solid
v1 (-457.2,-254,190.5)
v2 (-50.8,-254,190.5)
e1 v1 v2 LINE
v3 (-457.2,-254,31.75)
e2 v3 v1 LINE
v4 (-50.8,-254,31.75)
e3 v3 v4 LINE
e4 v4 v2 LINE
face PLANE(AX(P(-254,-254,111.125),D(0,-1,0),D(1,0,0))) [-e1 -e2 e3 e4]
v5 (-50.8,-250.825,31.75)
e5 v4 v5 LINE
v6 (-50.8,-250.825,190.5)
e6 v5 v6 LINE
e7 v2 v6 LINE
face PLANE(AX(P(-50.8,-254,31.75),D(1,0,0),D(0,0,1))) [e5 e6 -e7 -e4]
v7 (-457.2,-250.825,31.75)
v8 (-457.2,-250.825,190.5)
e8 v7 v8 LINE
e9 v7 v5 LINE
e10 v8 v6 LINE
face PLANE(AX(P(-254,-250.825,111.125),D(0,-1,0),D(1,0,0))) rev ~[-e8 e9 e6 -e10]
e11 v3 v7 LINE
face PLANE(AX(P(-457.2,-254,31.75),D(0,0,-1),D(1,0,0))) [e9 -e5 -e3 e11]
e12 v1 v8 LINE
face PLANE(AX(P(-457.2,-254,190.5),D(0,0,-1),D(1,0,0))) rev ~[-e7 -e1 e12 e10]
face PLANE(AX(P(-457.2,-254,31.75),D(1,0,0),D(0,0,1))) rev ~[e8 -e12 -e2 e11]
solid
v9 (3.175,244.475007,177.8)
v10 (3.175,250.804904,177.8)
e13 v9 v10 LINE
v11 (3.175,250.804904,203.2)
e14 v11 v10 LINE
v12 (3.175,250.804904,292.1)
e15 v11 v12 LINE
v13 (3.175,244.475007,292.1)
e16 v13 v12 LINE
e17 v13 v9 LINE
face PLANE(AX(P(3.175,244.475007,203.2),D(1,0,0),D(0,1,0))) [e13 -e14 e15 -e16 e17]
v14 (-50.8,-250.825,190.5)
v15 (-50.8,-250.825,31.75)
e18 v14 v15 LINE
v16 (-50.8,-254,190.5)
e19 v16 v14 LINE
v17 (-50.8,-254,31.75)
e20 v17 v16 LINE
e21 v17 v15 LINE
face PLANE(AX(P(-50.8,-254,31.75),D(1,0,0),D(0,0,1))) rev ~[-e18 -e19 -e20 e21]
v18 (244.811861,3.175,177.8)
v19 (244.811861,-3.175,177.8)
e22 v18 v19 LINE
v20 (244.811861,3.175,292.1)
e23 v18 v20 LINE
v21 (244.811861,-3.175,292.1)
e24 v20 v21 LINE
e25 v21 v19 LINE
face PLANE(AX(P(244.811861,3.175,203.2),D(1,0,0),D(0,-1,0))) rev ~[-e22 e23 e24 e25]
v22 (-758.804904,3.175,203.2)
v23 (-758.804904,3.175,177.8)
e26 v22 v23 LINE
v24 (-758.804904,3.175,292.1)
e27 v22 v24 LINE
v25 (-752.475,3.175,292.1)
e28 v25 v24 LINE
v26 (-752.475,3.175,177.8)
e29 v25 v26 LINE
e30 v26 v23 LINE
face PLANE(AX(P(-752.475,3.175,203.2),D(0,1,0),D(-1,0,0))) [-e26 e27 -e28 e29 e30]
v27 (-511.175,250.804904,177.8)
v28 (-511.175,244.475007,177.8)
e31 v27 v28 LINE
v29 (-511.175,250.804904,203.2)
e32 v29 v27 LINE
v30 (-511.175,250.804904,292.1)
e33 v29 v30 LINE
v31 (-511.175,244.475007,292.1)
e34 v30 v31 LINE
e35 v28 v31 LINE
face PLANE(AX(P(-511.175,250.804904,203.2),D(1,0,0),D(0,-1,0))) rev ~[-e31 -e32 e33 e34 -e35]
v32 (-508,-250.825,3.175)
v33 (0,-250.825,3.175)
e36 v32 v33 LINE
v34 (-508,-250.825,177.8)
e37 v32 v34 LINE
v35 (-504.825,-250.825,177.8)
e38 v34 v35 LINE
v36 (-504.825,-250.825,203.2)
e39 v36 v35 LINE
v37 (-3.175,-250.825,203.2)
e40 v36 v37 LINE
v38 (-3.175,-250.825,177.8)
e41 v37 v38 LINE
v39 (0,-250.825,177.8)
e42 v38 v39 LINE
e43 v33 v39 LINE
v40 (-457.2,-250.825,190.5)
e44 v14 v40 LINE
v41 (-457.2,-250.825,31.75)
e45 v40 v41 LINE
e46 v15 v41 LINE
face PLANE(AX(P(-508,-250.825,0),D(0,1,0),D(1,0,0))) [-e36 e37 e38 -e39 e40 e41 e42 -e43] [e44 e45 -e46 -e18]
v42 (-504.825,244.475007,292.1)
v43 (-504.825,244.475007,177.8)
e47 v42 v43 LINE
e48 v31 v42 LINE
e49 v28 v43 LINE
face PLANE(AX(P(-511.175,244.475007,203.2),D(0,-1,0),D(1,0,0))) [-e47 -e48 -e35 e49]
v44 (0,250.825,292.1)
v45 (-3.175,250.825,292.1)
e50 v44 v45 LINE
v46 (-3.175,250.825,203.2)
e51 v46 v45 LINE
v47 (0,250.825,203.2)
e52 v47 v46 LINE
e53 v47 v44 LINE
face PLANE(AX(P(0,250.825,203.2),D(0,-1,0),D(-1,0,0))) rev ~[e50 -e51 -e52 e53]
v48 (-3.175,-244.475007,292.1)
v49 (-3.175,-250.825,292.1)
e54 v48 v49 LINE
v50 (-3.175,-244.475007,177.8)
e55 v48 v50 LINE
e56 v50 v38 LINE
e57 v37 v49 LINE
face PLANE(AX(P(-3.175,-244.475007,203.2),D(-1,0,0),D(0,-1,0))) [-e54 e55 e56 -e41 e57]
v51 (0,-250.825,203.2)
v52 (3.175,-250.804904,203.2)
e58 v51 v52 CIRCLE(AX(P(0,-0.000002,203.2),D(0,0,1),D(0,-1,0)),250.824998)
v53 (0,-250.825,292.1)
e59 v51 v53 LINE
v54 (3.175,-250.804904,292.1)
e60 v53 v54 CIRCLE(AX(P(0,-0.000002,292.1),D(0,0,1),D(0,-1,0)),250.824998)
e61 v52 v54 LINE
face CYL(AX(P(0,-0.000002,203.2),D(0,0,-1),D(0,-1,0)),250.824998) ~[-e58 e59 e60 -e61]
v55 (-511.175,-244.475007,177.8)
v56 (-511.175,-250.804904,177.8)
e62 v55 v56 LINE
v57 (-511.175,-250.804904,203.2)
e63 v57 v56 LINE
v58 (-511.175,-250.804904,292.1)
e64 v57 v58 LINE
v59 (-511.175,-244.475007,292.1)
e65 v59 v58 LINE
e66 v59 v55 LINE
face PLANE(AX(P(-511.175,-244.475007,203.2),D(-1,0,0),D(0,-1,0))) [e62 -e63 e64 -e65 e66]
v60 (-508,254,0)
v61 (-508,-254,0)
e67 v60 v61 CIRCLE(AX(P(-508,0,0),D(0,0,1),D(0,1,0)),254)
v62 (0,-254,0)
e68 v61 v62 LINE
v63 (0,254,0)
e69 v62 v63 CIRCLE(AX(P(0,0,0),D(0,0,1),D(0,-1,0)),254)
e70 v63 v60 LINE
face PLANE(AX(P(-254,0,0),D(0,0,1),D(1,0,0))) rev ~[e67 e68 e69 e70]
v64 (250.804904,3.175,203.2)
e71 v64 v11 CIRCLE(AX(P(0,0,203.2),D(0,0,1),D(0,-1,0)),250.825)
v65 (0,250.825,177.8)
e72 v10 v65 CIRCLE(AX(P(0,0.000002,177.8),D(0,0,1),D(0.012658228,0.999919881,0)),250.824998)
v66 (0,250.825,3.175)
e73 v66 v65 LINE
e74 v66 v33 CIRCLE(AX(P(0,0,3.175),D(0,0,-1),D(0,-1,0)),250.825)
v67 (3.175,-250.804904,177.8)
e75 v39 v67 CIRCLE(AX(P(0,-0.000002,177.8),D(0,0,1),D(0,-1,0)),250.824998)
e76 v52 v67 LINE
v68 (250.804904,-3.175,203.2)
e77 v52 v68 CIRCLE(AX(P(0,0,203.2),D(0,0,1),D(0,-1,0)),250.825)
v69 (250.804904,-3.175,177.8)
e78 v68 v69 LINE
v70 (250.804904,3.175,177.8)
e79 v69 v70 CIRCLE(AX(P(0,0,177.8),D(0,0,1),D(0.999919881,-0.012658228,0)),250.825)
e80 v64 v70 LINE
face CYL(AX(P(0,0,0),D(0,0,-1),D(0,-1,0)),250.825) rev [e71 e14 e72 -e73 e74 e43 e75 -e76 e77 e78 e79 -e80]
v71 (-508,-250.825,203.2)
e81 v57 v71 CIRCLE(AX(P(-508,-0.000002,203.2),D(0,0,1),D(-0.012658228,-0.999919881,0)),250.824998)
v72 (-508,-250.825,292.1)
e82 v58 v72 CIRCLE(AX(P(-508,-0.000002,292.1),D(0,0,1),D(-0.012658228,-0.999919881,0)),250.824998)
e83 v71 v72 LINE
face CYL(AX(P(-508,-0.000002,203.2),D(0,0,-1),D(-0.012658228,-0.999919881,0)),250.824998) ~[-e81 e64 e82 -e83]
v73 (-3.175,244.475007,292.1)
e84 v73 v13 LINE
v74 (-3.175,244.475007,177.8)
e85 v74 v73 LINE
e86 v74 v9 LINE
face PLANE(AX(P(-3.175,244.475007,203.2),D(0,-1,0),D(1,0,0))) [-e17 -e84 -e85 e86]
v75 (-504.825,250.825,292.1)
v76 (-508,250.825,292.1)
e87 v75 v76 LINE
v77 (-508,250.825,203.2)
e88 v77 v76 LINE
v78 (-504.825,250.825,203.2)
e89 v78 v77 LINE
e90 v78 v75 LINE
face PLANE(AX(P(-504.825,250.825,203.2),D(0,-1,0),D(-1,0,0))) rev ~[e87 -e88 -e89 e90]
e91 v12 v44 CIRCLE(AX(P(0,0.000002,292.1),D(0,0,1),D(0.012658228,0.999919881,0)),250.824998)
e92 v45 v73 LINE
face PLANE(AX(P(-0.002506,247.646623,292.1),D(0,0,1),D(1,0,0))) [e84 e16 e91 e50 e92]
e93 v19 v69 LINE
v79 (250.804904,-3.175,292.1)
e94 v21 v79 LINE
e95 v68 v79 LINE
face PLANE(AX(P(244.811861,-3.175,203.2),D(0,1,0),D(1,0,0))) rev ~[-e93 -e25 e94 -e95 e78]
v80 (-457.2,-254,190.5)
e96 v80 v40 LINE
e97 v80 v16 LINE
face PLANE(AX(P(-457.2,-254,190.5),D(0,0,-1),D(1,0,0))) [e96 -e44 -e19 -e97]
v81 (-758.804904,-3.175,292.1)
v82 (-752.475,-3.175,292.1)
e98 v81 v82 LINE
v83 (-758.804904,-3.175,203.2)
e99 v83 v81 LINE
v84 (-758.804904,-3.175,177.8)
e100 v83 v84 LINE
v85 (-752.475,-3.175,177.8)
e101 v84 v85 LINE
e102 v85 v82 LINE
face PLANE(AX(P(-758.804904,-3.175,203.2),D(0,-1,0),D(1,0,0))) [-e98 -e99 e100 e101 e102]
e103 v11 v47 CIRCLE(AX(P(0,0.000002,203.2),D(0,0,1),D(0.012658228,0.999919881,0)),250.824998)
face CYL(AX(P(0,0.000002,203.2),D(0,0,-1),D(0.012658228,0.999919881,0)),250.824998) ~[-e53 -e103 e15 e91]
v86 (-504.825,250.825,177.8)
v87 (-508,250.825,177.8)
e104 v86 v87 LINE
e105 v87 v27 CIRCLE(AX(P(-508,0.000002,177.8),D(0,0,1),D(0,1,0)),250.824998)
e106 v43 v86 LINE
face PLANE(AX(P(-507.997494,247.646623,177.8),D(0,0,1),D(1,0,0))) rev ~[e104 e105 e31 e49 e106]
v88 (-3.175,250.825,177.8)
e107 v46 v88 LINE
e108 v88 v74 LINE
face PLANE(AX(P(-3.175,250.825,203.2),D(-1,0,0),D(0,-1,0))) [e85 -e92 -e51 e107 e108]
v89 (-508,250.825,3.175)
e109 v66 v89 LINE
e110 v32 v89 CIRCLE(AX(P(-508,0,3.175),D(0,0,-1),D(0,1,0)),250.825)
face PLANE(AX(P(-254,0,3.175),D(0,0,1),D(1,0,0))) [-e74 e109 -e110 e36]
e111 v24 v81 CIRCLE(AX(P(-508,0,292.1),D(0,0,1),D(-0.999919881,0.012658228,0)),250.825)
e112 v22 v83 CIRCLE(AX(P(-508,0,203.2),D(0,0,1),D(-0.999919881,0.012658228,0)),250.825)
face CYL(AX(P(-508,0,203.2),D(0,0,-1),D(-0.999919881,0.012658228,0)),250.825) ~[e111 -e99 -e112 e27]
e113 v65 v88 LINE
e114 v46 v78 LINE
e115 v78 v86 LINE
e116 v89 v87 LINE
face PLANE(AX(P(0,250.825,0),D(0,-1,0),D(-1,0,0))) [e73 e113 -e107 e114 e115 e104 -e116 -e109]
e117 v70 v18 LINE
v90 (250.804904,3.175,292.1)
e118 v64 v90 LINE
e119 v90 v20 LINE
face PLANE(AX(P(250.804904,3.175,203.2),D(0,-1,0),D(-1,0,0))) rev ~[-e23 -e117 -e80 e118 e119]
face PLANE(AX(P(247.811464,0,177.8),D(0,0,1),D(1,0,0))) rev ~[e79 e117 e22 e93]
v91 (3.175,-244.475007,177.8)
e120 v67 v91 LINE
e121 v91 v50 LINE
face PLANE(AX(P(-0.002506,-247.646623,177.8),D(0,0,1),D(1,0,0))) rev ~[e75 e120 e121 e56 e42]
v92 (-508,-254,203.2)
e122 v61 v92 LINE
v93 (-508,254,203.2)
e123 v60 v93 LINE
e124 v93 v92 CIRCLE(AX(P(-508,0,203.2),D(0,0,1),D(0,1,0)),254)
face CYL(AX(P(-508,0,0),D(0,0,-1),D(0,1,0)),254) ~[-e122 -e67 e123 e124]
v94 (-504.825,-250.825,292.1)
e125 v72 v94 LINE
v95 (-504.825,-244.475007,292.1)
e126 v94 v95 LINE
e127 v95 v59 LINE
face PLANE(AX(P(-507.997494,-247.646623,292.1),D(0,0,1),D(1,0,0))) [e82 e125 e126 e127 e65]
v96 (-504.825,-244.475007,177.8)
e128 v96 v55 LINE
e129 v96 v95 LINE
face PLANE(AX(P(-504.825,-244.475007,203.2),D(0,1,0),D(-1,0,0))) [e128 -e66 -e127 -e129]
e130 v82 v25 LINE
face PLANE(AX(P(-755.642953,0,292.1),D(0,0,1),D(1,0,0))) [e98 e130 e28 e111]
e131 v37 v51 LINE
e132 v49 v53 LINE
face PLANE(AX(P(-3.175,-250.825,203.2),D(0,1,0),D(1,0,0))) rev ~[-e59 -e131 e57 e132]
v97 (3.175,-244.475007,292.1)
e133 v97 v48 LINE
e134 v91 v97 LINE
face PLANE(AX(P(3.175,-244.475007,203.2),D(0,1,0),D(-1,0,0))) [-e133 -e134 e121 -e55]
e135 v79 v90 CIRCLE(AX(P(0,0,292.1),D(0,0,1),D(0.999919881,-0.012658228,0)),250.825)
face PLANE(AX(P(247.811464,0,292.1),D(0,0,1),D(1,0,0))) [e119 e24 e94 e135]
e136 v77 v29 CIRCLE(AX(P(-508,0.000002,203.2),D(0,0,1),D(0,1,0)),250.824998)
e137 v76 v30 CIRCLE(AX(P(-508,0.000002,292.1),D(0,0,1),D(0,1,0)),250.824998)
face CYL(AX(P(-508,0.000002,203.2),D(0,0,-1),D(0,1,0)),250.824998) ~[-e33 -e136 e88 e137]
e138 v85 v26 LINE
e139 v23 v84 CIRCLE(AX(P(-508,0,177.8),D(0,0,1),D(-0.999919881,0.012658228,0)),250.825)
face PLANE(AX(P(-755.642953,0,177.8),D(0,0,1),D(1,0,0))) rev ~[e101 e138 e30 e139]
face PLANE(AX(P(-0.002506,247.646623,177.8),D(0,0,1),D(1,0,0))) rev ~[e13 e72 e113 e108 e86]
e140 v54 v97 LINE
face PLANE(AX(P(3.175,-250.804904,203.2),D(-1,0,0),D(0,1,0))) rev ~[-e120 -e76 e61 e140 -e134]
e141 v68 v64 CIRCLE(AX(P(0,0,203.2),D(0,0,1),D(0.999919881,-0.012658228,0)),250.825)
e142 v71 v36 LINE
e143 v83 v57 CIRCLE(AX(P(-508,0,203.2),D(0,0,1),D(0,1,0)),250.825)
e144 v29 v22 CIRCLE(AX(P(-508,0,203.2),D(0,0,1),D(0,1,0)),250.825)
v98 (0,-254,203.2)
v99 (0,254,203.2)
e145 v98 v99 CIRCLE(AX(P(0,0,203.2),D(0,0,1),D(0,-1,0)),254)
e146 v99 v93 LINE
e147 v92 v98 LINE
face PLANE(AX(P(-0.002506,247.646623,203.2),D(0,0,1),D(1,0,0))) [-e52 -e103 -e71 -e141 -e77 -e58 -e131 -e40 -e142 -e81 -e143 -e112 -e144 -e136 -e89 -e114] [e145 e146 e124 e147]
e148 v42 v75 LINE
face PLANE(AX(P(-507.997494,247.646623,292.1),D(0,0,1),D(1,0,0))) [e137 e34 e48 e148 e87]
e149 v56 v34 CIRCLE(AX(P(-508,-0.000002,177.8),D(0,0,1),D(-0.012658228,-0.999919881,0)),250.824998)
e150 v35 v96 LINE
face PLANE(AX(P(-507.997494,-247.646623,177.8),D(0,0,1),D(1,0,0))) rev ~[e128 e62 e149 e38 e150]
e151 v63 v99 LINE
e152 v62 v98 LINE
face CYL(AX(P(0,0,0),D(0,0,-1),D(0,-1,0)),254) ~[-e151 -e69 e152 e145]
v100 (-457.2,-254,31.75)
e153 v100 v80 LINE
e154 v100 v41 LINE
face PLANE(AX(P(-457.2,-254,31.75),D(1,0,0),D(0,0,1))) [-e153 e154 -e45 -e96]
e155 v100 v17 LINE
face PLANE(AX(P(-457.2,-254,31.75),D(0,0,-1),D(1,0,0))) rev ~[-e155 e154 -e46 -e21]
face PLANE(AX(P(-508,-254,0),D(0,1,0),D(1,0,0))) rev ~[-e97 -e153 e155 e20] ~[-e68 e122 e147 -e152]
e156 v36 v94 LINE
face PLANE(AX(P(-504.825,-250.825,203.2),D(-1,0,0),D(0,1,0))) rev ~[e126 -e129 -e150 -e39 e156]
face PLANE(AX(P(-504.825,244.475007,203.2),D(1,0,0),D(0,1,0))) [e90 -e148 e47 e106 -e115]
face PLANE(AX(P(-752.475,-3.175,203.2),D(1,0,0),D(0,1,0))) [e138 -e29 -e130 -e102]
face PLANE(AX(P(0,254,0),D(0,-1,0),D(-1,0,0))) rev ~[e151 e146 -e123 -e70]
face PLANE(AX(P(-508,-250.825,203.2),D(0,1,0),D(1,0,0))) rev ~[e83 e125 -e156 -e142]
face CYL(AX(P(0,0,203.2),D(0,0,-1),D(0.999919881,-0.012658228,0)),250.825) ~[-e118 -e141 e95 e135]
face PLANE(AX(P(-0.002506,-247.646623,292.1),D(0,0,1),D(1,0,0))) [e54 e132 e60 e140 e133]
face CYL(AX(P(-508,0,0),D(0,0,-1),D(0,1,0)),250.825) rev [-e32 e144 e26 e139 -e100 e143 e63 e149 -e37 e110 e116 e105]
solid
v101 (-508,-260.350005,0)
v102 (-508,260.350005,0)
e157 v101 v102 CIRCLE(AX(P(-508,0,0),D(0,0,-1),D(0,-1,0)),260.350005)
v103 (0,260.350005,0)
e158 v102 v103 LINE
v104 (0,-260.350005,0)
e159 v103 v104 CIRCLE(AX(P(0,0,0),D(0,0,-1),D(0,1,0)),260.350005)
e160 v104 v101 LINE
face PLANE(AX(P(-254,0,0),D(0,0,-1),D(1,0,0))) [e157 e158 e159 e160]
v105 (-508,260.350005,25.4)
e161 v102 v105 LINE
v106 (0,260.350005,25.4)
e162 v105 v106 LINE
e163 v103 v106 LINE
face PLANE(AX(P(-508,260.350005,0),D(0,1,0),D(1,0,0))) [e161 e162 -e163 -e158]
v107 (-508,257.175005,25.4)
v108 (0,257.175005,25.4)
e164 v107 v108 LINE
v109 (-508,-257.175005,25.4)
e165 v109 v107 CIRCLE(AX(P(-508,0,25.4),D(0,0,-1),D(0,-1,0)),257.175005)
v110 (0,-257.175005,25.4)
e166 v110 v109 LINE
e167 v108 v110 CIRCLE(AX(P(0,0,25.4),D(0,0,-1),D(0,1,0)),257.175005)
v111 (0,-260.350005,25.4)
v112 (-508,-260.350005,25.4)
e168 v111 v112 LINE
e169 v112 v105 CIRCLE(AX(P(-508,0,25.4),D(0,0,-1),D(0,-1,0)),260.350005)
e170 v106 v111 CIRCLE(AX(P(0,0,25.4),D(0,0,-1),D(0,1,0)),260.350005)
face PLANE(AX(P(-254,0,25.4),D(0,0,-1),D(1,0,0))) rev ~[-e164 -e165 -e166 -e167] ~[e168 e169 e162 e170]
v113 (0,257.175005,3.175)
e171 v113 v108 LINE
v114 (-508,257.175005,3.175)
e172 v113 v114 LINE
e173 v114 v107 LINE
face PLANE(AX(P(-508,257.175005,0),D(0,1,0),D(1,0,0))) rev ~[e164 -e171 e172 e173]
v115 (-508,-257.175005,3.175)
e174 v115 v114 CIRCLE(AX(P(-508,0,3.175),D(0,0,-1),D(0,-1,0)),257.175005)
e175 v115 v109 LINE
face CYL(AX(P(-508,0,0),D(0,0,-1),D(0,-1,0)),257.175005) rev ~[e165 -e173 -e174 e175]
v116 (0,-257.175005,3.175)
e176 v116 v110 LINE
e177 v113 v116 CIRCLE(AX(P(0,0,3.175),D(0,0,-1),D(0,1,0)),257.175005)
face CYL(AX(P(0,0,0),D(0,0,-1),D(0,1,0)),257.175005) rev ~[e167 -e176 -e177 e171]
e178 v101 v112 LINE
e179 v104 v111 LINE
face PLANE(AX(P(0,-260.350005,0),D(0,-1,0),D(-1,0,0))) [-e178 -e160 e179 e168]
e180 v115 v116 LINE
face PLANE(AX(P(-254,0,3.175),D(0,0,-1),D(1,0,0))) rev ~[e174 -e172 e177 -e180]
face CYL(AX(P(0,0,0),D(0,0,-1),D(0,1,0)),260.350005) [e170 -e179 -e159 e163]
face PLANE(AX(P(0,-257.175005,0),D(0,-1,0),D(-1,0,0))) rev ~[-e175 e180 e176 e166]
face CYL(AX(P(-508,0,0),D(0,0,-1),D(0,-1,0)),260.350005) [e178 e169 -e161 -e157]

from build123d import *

# Parameters (mm, degrees)
F1_DEPTH       = 203.2
F2_T           = -3.175
F4_W           = 406.4
F4_H           = 158.75
F5_DEPTH       = 25.4
F6_W           = 406.4
F6_H           = 158.75
F7_DEPTH       = 3.175
F10_DEPTH      = 25.4
F11_T          = -3.175
F14_DEPTH      = 25.4
F14_DEPTH_BACK = 88.9


with BuildPart() as f1:
    # F0 (on Top) → F1 (new body)
    with BuildSketch(Plane.XY):
        with BuildLine():
            Line((-508, -254), (0, -254))
            ThreePointArc((0, -254), (254, 0), (0, 254))
            Line((0, 254), (-508, 254))
            ThreePointArc((-508, 254), (-762, 0), (-508, -254))
        make_face()
    extrude(amount=F1_DEPTH)

    # F2
    f2_openings = [f1.faces().sort_by_distance(p)[0] for p in [
        (-254, 0, 203.2),
    ]]
    offset(amount=F2_T, openings=f2_openings)

    # F4 (on offset) → F5 (cut)
    with BuildSketch(Plane.XZ.offset(254)):
        with Locations((-254, 111.125)):
            Rectangle(F4_W, F4_H)
    extrude(amount=-F5_DEPTH, mode=Mode.SUBTRACT)

    # F13 (on offset) → F14 (join, two sides)
    with BuildSketch(Plane.XY.offset(203.2)) as f14_sk:
        with BuildLine():
            ThreePointArc((250.8049042583, -3.175), (250.825, 0), (250.8049042583, 3.175))
            Line((250.8049042583, 3.175), (244.8118613124, 3.175))
            Line((244.8118613124, 3.175), (244.8118613124, -3.175))
            Line((244.8118613124, -3.175), (250.8049042583, -3.175))
        make_face()
        with BuildLine():
            Line((0, 250.825), (-3.175, 250.825))
            Line((-3.175, 250.825), (-3.175, 244.4750070572))
            Line((-3.175, 244.4750070572), (0, 244.4750070572))
            Line((0, 244.4750070572), (3.175, 244.4750070572))
            Line((3.175, 244.4750070572), (3.175, 250.8049042583))
            ThreePointArc((3.175, 250.8049042583), (1.587531798, 250.8199760143), (0, 250.825))
        make_face()
        with BuildLine():
            Line((-504.825, 250.825), (-508, 250.825))
            ThreePointArc((-508, 250.825), (-509.587531798, 250.8199760143), (-511.175, 250.8049042583))
            Line((-511.175, 250.8049042583), (-511.175, 244.4750070572))
            Line((-511.175, 244.4750070572), (-508, 244.4750070572))
            Line((-508, 244.4750070572), (-504.825, 244.4750070572))
            Line((-504.825, 244.4750070572), (-504.825, 250.825))
        make_face()
        with BuildLine():
            Line((-752.475, 3.175), (-758.8049042583, 3.175))
            ThreePointArc((-758.8049042583, 3.175), (-758.825, 0), (-758.8049042583, -3.175))
            Line((-758.8049042583, -3.175), (-752.475, -3.175))
            Line((-752.475, -3.175), (-752.475, 0))
            Line((-752.475, 0), (-752.475, 3.175))
        make_face()
        with BuildLine():
            Line((-511.175, -244.4750070572), (-511.175, -250.8049042583))
            ThreePointArc((-511.175, -250.8049042583), (-509.587531798, -250.8199760143), (-508, -250.825))
            Line((-508, -250.825), (-504.825, -250.825))
            Line((-504.825, -250.825), (-504.825, -244.4750070572))
            Line((-504.825, -244.4750070572), (-508, -244.4750070572))
            Line((-508, -244.4750070572), (-511.175, -244.4750070572))
        make_face()
        with BuildLine():
            Line((-3.175, -244.4750070572), (-3.175, -250.825))
            Line((-3.175, -250.825), (0, -250.825))
            ThreePointArc((0, -250.825), (1.587531798, -250.8199760143), (3.175, -250.8049042583))
            Line((3.175, -250.8049042583), (3.175, -244.4750070572))
            Line((3.175, -244.4750070572), (0, -244.4750070572))
            Line((0, -244.4750070572), (-3.175, -244.4750070572))
        make_face()
    extrude(amount=-F14_DEPTH)
    extrude(f14_sk.sketch, amount=F14_DEPTH_BACK)


with BuildPart() as f7:
    # F6 (on offset) → F7 (new body)
    with BuildSketch(Plane.XZ.offset(254)):
        with Locations((-254, 111.125)):
            Rectangle(F6_W, F6_H)
    extrude(amount=-F7_DEPTH)


with BuildPart() as f10:
    # F9 (on offset) → F10 (new body)
    with BuildSketch(Plane(origin=(0, 0, 0), x_dir=(1, 0, 0), z_dir=(0, 0, -1))):
        with BuildLine():
            ThreePointArc((-508, 260.3500051498), (-768.3500051498, 0), (-508, -260.3500051498))
            Line((-508, -260.3500051498), (0, -260.3500051498))
            ThreePointArc((0, -260.3500051498), (260.3500051498, 0), (0, 260.3500051498))
            Line((0, 260.3500051498), (-508, 260.3500051498))
        make_face()
    extrude(amount=-F10_DEPTH)

    # F11
    f11_openings = [f10.faces().sort_by_distance(p)[0] for p in [
        (-254, 0, 25.4),
    ]]
    offset(amount=F11_T, openings=f11_openings)


solid = Compound([f1.part, f7.part, f10.part])
